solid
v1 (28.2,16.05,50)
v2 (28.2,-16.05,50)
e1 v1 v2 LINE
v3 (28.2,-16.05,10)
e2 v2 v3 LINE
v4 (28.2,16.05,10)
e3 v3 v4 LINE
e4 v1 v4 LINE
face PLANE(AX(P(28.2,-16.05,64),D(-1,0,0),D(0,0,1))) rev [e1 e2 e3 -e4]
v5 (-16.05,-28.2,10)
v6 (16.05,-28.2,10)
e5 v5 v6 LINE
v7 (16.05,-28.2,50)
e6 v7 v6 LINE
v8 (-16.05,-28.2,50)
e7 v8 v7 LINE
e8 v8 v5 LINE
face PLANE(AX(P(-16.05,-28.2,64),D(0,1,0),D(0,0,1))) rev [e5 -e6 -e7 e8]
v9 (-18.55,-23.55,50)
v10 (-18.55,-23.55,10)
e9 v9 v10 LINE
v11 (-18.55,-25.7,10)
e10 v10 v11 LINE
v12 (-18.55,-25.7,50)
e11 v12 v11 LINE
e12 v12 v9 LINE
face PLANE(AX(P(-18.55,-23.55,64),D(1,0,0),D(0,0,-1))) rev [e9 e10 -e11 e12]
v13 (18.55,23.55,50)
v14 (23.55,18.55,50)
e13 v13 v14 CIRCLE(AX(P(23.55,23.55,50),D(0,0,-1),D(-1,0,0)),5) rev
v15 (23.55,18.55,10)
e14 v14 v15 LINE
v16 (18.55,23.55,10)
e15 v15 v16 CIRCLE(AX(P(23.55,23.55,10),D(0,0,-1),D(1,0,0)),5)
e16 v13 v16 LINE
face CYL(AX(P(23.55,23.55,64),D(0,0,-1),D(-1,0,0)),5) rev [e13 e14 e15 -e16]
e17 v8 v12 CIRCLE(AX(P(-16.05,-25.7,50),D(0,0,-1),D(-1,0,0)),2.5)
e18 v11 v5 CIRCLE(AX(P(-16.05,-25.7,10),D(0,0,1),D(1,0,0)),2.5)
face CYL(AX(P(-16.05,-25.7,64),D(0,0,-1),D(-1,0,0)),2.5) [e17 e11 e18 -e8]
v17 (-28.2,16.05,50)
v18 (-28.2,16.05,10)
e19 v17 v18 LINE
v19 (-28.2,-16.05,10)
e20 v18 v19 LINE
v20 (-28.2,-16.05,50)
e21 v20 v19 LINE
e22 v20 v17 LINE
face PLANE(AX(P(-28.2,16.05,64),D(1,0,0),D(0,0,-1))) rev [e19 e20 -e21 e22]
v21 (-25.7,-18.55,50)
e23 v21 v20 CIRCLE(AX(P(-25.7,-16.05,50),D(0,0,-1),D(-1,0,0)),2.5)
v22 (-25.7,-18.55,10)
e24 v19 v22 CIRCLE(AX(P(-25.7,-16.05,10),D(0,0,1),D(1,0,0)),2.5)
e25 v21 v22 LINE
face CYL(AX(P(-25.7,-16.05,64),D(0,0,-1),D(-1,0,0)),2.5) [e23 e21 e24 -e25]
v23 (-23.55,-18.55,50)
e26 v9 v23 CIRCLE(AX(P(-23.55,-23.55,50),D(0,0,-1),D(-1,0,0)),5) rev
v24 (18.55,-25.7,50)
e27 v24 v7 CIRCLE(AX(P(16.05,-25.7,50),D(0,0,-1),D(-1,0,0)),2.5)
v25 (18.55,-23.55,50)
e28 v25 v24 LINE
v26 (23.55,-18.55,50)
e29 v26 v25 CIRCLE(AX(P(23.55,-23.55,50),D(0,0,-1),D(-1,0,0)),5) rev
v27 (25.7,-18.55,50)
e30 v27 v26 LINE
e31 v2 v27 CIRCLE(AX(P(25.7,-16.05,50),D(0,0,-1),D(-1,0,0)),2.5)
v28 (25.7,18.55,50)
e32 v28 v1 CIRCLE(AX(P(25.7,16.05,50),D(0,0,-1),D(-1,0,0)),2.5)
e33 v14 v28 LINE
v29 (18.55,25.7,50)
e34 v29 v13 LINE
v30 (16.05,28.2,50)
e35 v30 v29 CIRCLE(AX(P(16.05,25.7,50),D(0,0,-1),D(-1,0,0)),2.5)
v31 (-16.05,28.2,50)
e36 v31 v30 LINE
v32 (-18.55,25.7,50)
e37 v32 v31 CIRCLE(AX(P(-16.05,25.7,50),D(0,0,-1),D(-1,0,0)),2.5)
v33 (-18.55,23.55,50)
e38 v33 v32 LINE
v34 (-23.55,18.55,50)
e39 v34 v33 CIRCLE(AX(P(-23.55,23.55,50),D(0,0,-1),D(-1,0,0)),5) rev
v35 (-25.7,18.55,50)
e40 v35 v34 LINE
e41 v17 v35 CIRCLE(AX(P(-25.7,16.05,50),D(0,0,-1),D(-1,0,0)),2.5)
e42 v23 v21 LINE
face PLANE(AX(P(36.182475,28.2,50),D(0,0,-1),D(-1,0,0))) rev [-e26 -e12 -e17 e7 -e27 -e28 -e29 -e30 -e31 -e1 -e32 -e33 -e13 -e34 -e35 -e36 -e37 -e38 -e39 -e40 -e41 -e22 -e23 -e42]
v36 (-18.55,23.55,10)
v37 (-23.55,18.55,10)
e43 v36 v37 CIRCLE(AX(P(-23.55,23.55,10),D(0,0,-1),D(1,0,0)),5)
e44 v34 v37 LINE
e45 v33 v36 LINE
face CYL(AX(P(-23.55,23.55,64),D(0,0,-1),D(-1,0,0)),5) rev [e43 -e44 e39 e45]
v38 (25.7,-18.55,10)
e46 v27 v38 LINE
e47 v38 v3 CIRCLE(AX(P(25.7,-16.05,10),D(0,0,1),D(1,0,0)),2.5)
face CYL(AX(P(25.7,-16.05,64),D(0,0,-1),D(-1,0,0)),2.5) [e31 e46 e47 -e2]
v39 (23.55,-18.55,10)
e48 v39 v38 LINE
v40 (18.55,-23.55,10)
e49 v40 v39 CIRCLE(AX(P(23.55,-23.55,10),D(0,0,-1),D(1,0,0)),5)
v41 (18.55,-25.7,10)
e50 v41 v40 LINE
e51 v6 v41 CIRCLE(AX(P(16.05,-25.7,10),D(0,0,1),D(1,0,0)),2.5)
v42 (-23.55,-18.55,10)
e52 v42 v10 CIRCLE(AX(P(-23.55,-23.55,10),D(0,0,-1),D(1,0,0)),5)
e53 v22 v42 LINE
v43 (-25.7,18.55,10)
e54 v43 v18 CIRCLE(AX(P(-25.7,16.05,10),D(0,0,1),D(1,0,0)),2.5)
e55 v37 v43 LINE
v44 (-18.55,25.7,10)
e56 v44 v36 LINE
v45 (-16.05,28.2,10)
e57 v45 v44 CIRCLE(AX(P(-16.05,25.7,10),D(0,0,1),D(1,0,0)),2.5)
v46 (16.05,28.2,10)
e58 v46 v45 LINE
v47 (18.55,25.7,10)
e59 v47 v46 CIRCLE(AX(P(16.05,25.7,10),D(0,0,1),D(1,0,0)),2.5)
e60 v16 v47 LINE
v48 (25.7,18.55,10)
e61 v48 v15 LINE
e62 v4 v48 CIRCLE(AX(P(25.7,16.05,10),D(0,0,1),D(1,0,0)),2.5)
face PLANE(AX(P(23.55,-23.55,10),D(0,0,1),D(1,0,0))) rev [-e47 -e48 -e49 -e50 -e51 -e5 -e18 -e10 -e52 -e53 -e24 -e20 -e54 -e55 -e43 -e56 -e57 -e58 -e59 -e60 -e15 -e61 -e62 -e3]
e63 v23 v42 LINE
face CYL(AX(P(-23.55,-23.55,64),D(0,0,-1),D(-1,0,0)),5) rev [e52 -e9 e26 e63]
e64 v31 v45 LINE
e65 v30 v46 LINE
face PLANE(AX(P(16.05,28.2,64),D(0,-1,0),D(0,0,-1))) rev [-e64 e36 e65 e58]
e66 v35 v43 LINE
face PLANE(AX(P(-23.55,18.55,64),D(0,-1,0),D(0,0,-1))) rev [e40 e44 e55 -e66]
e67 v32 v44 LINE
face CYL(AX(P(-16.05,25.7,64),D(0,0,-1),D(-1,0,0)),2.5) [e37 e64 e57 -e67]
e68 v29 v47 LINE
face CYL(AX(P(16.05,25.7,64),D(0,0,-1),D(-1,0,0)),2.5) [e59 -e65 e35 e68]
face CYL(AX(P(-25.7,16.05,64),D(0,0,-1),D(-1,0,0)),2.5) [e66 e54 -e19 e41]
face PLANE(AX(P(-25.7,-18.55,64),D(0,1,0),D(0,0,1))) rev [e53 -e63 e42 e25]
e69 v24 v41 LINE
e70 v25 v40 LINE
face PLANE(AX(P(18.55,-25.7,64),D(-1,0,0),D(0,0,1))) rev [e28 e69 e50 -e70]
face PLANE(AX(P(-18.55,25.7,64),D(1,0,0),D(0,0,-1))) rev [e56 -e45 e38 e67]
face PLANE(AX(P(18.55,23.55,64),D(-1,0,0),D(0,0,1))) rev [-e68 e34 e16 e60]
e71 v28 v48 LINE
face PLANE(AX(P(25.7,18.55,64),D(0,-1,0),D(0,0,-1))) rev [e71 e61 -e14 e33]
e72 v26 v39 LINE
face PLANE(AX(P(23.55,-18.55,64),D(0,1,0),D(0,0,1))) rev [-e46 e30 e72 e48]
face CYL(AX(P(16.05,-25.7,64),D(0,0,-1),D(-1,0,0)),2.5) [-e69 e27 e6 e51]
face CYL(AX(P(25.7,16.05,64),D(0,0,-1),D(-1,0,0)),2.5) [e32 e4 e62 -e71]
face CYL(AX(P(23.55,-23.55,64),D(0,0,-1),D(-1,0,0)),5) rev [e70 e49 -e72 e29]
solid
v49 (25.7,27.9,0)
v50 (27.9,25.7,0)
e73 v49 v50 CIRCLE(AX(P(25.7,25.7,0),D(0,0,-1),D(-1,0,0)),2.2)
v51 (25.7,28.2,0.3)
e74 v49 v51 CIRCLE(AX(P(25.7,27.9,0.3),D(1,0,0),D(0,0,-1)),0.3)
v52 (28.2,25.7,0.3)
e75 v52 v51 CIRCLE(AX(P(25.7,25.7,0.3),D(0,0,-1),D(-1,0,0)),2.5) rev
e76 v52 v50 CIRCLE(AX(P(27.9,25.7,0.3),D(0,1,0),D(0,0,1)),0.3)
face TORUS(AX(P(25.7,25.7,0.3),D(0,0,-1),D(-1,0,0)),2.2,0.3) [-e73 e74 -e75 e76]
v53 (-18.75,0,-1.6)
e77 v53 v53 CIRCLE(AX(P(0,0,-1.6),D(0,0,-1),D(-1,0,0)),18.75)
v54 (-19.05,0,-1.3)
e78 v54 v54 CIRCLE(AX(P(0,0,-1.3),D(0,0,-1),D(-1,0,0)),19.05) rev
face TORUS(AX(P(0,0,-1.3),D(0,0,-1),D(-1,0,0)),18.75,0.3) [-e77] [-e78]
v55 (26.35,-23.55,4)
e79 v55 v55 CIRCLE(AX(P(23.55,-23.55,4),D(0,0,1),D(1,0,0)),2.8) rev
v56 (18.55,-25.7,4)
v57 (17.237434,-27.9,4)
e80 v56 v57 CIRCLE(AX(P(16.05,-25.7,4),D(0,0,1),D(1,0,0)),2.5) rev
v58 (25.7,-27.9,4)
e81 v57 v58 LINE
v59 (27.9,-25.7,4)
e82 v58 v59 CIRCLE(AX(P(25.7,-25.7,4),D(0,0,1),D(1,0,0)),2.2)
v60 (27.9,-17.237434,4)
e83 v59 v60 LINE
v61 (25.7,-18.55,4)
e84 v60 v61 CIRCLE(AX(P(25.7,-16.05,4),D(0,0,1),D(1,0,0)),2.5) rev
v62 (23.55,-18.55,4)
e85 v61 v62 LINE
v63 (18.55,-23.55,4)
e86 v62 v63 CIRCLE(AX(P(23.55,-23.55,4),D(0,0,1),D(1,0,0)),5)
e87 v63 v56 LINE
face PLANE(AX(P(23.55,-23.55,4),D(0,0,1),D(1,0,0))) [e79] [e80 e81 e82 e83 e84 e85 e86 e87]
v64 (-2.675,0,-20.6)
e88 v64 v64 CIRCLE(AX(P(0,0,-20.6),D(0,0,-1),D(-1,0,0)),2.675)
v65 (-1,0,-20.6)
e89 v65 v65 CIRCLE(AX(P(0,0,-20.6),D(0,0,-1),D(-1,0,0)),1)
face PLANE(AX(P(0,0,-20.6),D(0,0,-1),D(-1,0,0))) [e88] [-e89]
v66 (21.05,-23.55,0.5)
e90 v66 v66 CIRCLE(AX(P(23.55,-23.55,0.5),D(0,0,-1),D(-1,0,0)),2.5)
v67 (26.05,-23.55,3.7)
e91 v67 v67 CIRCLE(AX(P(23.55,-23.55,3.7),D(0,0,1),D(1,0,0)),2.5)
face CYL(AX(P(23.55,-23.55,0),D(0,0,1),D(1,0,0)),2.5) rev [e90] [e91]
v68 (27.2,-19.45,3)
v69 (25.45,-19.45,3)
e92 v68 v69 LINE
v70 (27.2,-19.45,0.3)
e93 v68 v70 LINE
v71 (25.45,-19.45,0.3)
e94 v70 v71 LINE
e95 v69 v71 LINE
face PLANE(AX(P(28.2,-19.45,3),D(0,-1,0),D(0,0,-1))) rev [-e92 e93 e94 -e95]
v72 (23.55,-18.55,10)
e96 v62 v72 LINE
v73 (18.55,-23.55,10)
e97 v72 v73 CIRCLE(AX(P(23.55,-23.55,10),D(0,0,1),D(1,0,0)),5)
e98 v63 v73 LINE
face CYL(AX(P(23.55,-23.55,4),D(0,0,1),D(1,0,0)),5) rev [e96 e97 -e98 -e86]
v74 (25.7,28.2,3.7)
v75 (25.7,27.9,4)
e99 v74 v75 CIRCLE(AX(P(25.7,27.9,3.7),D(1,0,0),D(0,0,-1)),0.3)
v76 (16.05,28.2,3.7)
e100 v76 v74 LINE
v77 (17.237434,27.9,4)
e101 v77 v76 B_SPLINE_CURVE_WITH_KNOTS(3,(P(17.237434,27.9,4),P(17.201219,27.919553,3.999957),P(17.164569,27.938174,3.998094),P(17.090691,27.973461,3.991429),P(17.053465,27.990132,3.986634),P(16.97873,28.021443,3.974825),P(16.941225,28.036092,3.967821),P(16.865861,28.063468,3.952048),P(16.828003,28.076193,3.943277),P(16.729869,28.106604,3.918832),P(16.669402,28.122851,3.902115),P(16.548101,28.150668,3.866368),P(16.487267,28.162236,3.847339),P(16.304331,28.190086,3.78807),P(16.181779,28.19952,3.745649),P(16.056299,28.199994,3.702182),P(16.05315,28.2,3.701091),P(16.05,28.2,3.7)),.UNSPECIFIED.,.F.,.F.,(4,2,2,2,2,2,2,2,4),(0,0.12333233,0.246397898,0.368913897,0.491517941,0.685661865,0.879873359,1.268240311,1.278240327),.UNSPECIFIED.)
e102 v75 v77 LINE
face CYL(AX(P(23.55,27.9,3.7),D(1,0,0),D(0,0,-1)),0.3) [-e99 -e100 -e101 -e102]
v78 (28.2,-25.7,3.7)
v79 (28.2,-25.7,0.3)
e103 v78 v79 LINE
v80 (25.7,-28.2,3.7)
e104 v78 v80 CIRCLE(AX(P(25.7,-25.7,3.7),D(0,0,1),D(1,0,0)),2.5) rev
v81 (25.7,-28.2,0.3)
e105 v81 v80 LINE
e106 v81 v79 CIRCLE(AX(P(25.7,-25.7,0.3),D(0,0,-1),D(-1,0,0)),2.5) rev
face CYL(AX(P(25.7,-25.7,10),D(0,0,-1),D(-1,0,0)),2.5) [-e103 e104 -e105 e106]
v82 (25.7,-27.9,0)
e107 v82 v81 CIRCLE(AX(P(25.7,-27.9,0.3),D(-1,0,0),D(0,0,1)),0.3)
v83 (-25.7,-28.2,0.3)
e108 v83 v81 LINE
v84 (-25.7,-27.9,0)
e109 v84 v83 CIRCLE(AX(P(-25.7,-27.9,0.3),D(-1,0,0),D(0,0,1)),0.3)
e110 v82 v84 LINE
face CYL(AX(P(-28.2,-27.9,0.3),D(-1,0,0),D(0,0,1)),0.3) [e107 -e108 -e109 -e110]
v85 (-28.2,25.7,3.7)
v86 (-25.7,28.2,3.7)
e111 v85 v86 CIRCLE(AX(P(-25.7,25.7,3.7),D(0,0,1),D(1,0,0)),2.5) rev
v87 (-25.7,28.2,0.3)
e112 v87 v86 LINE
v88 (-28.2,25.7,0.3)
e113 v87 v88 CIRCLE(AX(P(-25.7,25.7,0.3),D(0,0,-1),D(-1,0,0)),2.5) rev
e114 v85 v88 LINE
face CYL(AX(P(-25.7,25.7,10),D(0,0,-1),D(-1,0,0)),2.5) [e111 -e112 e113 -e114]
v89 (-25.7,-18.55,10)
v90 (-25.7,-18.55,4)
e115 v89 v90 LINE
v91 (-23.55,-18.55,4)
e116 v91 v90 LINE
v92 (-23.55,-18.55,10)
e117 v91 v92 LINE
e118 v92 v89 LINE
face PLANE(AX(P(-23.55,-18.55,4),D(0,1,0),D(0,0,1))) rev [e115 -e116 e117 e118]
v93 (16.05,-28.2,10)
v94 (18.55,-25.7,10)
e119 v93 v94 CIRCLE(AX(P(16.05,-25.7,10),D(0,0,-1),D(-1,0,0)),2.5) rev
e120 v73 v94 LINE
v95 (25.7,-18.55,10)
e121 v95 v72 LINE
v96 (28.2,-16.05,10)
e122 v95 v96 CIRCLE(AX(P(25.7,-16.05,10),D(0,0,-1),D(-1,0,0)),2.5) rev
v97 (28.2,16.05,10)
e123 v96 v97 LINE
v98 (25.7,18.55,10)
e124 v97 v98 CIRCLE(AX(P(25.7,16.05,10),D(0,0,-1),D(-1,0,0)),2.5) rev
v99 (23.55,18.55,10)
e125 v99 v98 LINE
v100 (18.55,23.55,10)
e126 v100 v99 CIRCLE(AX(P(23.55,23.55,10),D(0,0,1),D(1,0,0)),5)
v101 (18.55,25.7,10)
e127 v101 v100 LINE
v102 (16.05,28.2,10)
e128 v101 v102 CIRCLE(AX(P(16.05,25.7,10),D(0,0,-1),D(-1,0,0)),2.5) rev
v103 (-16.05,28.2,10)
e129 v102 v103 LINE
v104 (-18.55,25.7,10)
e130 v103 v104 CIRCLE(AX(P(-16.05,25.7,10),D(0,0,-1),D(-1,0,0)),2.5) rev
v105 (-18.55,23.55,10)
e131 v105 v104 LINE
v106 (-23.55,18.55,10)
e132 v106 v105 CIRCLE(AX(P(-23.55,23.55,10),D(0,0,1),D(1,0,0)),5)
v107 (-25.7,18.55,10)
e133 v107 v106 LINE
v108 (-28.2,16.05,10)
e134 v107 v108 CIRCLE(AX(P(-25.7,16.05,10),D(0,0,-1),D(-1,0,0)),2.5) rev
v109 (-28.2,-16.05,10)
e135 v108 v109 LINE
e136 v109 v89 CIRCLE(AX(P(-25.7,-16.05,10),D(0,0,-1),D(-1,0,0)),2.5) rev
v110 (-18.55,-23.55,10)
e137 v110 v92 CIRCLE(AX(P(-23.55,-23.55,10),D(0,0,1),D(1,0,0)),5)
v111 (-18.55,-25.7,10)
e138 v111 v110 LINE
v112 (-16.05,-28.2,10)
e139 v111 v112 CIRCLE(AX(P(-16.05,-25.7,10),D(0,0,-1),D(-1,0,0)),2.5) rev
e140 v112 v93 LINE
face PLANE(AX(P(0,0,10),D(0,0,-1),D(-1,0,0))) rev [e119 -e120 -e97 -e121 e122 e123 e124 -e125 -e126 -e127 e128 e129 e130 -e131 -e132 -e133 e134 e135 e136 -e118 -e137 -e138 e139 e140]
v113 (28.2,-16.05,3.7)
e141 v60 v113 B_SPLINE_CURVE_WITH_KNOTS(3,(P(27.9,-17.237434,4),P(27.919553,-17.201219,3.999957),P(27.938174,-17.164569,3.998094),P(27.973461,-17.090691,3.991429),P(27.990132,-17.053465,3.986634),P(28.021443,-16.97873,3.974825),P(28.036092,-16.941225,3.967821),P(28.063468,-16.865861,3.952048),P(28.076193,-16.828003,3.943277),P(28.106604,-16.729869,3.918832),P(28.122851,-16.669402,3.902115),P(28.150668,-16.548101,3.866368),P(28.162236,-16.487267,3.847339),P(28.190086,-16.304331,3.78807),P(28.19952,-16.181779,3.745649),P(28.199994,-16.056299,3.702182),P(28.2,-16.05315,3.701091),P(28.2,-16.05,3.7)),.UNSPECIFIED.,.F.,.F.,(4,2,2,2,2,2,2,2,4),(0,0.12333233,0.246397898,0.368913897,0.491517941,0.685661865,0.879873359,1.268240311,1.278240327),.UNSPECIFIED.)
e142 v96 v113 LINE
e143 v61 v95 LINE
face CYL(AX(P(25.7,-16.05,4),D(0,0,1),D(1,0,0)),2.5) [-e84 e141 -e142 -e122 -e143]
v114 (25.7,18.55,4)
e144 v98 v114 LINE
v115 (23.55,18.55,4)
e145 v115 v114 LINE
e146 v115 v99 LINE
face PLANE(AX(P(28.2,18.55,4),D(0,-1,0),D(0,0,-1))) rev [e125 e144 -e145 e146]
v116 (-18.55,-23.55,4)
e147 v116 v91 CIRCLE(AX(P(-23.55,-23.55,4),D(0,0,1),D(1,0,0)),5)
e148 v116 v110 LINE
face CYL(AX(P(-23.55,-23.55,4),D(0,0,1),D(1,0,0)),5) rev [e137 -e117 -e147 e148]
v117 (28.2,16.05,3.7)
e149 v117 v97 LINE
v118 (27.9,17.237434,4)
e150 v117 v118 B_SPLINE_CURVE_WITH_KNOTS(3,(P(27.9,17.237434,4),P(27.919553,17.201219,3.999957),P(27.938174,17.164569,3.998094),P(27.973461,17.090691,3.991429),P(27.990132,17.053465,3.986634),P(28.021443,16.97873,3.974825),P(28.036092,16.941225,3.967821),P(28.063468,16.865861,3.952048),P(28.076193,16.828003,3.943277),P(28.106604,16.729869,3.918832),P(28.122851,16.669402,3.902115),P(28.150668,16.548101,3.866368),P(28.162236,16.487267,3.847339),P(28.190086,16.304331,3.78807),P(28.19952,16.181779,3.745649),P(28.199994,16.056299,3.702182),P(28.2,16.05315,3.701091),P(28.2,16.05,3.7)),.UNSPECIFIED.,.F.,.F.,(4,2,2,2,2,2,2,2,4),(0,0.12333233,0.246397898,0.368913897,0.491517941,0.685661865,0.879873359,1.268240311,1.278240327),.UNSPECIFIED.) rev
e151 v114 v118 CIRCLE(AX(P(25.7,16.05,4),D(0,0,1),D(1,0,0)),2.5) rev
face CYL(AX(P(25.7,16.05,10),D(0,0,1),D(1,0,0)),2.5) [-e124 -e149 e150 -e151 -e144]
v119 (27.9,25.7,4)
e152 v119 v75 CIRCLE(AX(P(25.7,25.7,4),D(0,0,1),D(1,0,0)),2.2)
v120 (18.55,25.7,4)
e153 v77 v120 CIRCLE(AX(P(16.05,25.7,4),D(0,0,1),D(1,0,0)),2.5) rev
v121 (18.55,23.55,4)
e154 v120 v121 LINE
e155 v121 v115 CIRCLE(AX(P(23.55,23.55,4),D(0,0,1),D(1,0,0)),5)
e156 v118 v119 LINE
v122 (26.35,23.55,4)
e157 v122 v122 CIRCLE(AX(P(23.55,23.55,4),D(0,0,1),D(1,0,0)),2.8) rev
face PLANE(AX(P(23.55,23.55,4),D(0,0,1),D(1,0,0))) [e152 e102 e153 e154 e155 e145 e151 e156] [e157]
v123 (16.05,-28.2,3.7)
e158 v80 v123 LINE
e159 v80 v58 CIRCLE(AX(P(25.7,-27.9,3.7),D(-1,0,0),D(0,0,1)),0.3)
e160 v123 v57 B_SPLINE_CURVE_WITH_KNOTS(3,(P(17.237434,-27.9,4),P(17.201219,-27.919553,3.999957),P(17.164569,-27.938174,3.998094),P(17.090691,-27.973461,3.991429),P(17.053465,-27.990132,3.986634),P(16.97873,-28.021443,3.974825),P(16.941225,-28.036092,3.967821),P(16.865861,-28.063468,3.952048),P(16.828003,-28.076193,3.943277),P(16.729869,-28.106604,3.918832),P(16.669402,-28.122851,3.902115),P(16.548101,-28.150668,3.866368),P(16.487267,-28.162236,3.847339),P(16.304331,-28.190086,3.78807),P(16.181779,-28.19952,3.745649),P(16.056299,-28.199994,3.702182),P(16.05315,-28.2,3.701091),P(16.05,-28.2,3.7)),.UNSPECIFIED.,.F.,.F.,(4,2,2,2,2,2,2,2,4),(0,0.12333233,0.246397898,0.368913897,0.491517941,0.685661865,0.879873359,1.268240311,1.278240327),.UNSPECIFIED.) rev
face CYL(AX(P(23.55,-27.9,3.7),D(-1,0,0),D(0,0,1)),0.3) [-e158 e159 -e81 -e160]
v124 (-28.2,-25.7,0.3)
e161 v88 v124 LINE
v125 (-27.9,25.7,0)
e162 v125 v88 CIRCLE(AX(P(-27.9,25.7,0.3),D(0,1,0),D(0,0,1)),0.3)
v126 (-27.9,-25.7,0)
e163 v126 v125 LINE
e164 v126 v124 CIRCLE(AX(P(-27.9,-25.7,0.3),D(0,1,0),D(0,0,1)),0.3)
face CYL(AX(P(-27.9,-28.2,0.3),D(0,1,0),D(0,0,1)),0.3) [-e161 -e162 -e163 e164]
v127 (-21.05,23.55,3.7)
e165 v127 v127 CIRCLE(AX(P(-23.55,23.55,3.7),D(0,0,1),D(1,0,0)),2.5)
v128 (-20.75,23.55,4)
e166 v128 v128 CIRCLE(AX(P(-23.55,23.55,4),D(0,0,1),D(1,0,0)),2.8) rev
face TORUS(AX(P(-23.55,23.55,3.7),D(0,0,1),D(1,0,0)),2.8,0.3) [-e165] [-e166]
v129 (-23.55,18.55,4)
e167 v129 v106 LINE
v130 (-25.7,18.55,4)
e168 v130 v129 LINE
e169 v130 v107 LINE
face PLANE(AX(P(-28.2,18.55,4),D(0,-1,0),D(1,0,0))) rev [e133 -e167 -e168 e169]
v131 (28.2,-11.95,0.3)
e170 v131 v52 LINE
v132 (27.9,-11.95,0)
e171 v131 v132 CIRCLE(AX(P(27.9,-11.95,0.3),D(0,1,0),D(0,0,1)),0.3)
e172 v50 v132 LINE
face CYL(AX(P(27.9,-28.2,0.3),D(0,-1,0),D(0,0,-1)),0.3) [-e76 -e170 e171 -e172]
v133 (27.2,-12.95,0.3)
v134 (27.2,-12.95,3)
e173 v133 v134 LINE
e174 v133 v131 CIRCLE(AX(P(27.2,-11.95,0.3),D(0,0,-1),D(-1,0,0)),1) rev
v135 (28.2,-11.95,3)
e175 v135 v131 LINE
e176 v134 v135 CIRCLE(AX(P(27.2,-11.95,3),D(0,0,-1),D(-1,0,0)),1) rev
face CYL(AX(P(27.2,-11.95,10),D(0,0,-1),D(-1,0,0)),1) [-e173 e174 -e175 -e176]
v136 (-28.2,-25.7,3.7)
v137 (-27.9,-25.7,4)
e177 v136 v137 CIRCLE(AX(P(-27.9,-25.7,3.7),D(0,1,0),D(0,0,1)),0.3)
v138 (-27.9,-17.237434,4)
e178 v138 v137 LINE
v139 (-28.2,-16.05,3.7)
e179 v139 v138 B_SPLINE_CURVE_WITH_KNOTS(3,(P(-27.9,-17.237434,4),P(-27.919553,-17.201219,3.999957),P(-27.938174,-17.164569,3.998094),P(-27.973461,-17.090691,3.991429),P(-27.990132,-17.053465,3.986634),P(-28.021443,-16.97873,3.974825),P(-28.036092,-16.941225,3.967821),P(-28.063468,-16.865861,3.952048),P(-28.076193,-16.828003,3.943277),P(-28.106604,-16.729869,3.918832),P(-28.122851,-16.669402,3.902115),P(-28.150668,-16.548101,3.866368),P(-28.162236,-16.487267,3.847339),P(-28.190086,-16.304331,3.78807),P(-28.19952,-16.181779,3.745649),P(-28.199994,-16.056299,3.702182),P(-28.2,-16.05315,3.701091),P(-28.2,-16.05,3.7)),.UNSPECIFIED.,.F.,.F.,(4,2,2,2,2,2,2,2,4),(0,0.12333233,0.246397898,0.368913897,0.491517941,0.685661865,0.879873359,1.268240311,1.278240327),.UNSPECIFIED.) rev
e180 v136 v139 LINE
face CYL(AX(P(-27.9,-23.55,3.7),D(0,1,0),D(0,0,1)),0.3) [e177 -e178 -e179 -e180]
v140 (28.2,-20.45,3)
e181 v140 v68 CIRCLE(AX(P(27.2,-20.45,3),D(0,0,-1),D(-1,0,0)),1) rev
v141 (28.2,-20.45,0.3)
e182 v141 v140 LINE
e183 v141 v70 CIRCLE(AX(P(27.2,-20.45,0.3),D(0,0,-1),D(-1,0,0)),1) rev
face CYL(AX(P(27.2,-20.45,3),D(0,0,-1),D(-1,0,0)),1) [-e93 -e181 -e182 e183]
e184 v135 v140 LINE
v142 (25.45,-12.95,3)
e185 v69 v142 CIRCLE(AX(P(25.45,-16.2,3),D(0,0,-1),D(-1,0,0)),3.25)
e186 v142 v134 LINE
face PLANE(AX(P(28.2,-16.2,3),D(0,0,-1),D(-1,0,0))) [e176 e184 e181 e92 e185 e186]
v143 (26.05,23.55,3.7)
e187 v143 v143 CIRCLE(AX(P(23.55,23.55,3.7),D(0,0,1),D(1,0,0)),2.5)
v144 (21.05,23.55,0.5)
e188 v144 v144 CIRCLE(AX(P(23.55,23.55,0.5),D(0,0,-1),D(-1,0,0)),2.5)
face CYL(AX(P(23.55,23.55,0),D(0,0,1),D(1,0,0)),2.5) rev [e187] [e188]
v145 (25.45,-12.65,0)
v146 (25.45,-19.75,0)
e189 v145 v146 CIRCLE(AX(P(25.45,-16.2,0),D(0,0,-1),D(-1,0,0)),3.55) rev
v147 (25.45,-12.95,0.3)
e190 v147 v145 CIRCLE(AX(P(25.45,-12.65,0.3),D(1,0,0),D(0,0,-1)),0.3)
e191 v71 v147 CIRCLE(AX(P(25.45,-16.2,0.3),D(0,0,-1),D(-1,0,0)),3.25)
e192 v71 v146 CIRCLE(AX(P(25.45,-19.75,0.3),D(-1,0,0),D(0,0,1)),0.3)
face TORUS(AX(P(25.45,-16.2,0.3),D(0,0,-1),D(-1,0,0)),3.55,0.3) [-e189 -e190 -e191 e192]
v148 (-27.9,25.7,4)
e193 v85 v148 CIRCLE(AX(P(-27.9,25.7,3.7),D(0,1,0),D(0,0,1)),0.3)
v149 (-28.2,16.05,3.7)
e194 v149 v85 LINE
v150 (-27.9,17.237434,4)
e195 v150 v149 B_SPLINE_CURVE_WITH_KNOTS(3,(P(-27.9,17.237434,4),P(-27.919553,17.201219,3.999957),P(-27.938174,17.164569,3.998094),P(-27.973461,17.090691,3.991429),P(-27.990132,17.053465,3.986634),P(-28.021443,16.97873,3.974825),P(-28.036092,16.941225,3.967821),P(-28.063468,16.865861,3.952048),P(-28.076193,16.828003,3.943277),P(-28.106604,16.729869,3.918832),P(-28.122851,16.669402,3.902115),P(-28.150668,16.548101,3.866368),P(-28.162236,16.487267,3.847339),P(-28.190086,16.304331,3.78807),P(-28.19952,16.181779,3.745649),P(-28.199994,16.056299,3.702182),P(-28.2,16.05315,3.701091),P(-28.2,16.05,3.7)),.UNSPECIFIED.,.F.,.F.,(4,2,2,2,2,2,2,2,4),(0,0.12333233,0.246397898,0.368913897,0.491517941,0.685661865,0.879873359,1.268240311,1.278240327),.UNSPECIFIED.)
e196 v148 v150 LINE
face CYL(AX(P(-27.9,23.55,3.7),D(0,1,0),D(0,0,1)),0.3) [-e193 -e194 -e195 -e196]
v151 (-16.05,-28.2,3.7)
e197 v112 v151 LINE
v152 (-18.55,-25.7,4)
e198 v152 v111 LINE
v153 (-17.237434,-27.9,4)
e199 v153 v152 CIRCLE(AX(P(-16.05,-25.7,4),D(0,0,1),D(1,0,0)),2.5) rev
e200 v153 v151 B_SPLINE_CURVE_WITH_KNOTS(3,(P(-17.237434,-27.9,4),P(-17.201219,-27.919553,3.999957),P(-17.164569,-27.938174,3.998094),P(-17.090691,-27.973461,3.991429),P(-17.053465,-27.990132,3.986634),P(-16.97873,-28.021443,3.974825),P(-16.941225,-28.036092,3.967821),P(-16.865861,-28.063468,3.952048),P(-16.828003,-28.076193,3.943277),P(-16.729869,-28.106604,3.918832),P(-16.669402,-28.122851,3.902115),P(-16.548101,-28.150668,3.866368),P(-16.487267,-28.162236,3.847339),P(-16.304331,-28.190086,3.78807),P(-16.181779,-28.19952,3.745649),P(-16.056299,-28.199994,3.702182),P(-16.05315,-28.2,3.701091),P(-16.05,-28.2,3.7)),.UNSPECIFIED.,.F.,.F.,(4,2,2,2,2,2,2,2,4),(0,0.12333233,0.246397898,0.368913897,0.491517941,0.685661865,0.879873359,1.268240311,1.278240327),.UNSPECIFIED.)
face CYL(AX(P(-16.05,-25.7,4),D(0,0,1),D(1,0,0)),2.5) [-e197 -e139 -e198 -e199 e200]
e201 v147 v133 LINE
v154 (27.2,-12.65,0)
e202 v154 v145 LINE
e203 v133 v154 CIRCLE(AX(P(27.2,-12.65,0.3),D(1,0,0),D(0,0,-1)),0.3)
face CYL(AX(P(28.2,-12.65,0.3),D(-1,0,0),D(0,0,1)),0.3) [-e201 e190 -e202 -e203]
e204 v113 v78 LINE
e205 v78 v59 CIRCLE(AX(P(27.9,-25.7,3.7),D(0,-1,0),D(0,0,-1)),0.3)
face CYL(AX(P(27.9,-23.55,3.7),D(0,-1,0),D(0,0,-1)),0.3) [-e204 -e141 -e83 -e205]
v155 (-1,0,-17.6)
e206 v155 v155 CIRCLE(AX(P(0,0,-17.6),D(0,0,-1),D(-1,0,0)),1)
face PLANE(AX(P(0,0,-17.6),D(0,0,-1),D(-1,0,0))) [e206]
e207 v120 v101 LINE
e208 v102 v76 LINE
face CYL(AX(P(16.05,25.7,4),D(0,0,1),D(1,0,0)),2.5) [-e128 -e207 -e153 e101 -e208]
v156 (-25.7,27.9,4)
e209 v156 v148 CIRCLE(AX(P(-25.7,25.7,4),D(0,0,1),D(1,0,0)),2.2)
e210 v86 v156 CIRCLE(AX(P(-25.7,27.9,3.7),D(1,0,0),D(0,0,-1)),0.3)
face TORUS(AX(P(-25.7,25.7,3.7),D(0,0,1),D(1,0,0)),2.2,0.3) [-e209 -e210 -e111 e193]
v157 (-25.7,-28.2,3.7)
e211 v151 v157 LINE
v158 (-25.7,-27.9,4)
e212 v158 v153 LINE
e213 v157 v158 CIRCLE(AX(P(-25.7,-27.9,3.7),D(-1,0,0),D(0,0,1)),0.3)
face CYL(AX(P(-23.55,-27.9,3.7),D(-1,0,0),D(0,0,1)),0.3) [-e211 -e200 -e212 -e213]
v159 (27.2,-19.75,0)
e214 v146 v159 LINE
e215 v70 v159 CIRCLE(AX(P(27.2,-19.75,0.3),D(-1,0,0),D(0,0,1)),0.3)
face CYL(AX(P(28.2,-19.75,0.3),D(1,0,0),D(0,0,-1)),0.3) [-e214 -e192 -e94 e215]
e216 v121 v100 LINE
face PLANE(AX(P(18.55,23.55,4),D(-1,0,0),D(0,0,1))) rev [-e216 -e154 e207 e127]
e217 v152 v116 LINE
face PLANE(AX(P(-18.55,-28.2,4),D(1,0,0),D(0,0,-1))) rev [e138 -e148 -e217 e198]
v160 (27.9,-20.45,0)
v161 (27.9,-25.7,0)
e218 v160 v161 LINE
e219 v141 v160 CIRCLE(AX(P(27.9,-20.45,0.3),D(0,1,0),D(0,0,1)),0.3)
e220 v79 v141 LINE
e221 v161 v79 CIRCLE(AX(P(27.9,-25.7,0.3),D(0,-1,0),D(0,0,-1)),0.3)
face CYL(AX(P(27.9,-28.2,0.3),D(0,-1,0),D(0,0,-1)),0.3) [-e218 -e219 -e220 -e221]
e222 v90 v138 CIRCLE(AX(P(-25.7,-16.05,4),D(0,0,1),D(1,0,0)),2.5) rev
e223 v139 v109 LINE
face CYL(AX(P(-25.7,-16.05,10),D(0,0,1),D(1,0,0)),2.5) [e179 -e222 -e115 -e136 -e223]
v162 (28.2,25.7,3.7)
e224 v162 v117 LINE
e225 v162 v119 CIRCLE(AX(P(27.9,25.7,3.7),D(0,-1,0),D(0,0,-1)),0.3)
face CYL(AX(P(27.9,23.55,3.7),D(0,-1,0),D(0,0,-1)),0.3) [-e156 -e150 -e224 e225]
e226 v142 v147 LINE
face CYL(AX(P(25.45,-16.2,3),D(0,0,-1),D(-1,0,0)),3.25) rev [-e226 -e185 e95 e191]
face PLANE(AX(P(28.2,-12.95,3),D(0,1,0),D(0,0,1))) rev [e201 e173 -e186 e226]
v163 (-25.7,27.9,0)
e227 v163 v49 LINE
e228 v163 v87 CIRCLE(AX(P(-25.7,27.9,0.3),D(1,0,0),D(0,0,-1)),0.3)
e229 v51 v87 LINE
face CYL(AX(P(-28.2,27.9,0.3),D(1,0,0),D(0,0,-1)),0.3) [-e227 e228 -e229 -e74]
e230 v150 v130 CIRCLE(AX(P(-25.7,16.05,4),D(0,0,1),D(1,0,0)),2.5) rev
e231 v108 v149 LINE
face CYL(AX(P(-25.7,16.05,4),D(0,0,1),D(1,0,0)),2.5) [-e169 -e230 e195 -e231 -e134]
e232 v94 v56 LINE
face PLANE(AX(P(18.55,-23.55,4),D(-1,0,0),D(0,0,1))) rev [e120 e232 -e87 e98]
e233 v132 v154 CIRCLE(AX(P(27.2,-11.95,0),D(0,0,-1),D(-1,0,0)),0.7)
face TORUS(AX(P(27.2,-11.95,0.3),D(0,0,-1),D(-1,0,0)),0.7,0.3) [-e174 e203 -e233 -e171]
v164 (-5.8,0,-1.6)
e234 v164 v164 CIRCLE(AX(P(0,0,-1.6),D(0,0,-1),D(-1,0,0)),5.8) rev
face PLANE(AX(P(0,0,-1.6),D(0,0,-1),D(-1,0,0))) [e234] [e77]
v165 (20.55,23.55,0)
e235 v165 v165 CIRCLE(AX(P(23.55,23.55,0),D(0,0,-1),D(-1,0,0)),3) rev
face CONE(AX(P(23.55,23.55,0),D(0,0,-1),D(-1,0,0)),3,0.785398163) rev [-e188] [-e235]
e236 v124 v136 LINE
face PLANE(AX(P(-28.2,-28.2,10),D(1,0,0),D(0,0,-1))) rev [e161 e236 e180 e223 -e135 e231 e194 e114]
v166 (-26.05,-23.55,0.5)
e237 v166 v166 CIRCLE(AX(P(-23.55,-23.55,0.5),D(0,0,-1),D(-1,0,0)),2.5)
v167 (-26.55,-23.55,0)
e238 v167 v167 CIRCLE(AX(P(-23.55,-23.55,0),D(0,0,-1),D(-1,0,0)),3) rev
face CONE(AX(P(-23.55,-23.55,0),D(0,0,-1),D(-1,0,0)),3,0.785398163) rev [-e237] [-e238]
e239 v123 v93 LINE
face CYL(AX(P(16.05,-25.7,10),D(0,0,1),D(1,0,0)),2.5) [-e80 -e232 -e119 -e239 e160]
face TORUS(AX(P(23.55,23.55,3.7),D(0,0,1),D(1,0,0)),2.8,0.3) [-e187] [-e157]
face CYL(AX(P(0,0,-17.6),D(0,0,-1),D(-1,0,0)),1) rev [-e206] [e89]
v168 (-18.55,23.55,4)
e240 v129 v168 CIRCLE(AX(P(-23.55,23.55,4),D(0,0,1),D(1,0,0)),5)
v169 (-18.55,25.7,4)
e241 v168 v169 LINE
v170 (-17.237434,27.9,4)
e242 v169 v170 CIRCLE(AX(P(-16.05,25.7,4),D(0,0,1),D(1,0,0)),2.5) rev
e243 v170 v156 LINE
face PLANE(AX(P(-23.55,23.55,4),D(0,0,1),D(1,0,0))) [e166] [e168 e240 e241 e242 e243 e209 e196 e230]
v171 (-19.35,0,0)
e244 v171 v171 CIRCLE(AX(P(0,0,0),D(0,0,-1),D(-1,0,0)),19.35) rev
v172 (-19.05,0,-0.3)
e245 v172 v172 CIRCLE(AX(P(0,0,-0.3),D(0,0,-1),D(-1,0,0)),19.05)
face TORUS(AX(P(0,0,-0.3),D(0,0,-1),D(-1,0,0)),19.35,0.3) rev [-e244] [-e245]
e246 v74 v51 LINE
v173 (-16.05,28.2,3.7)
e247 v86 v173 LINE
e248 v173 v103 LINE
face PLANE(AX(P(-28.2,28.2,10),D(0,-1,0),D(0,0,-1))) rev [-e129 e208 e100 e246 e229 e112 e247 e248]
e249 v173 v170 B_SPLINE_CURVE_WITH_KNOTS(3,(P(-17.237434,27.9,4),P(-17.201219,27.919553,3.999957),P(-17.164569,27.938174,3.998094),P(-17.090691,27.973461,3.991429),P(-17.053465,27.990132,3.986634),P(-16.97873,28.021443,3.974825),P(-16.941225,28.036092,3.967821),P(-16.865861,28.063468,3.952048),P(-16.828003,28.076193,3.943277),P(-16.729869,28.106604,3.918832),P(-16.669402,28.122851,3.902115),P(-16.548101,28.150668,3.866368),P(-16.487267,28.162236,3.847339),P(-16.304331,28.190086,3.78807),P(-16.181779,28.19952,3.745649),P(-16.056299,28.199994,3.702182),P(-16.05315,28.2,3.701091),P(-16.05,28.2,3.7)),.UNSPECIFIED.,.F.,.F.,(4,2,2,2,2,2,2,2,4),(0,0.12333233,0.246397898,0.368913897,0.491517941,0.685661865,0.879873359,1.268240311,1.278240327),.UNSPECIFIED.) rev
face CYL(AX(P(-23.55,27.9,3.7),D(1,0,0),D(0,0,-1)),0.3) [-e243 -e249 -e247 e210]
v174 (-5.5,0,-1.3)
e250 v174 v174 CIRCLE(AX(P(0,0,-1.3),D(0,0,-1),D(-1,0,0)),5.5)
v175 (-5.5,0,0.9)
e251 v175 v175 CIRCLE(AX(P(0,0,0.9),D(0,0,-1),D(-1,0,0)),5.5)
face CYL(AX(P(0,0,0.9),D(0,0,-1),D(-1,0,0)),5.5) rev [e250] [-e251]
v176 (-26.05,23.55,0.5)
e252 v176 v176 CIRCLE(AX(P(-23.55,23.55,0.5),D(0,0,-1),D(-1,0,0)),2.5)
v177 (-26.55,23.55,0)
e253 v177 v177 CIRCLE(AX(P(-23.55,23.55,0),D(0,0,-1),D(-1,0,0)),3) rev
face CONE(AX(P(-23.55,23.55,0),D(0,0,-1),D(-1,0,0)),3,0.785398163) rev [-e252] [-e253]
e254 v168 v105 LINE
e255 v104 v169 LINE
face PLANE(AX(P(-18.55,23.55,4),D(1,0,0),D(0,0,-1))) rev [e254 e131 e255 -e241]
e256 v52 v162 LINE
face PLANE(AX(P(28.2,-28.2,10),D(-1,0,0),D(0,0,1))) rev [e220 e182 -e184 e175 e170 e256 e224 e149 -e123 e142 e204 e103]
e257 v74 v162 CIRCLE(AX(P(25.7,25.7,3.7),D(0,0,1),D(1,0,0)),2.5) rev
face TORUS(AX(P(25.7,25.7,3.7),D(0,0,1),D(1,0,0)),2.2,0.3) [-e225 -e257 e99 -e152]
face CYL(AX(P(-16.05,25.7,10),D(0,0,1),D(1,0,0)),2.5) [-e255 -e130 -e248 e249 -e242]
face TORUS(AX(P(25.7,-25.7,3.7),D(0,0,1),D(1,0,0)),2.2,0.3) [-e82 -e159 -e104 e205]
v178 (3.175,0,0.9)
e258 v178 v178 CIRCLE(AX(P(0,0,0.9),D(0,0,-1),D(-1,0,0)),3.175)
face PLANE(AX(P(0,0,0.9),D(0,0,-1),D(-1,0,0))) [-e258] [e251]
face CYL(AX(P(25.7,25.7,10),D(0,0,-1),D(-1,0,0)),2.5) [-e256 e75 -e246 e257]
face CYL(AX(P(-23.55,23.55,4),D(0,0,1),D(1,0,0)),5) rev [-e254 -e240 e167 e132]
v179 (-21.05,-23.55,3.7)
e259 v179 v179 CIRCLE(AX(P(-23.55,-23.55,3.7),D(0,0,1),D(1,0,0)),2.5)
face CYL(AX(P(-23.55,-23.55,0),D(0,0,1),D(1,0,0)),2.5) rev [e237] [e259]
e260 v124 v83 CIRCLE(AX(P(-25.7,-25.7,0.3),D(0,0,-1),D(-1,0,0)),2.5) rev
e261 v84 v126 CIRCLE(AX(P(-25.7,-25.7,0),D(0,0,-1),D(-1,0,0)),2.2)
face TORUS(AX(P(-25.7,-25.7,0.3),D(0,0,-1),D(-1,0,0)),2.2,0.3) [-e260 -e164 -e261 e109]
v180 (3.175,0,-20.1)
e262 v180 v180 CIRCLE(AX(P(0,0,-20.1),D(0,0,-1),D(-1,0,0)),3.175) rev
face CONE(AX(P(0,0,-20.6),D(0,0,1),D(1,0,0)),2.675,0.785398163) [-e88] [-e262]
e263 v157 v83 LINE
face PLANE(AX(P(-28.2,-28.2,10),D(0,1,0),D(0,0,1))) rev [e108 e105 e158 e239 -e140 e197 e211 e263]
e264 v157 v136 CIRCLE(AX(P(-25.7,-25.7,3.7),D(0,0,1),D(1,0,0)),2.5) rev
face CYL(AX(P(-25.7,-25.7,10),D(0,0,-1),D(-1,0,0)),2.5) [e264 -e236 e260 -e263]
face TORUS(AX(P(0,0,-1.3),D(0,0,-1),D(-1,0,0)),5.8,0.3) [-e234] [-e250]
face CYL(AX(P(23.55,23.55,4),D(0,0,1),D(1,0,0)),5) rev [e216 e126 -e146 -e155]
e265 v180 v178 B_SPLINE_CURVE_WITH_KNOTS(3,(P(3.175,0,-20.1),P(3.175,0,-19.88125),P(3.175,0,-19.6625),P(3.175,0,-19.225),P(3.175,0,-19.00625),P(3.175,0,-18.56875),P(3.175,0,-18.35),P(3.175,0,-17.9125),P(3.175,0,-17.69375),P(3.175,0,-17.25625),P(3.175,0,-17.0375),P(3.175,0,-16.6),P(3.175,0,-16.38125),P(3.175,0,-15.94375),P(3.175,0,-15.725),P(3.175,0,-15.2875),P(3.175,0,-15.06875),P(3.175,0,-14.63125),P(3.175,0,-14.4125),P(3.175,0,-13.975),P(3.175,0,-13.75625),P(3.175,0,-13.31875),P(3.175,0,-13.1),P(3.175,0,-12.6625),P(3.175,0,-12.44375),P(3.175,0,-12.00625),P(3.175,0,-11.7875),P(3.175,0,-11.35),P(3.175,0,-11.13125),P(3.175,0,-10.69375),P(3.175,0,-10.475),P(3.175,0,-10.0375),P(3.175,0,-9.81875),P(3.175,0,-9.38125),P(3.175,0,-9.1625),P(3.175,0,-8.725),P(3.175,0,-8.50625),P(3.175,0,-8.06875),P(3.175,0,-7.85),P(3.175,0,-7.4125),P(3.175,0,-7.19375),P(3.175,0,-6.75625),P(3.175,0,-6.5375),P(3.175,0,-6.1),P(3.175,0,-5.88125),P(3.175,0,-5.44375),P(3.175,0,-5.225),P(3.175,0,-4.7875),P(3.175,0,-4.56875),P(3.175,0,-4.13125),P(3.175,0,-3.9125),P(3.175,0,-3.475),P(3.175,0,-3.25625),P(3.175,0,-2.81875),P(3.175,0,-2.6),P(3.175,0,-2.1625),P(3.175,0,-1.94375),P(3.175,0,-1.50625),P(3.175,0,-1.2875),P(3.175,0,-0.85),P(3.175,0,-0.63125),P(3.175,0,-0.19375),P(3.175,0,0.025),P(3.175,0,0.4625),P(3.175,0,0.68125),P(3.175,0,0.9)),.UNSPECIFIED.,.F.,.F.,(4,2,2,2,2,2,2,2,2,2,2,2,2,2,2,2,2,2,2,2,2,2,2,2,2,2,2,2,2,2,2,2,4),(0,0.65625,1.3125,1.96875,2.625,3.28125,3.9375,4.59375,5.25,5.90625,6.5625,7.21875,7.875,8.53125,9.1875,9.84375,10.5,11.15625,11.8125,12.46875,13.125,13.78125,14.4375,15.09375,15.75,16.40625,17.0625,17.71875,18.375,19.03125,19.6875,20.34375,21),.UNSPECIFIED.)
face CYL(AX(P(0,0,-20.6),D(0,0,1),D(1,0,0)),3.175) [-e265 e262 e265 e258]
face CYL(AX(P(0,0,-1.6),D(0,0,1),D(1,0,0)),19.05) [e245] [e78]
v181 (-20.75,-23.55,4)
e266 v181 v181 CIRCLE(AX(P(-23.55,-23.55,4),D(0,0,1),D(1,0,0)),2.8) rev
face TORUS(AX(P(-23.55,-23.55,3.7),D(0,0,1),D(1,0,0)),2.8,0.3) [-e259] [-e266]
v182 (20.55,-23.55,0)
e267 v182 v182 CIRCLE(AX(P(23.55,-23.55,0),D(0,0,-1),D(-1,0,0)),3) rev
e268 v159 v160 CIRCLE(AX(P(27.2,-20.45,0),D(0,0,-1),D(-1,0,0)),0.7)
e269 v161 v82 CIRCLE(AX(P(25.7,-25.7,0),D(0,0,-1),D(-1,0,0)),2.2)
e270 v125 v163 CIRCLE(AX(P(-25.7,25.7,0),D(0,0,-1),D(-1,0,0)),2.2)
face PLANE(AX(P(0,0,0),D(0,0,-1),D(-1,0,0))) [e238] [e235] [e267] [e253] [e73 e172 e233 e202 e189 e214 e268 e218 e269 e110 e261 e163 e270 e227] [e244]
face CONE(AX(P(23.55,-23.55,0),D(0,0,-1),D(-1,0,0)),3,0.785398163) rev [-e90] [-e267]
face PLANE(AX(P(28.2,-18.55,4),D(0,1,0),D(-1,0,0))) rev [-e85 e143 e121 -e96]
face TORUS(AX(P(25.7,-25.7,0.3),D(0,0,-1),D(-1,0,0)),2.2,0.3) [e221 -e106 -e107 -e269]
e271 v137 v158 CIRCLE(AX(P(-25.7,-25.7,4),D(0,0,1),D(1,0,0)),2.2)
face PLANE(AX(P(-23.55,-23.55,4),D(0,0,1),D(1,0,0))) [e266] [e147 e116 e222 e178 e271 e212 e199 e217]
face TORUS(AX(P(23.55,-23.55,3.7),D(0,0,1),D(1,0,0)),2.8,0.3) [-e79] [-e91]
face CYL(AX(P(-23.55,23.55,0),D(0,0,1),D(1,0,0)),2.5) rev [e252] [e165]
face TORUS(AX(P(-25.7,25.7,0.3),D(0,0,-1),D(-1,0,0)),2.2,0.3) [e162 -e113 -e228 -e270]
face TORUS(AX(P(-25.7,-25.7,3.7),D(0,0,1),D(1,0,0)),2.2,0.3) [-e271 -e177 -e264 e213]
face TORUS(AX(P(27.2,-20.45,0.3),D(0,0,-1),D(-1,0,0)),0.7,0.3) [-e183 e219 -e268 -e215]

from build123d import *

# Parameters (mm, degrees)
SKETCH_1_W          = 56.4
SKETCH_1_H          = 56.4
EXTRUDE_1_DEPTH     = 10
SKETCH_2_R          = 2.5
CUT_EXTRUDE_1_DEPTH = 42.115447219
CUT_EXTRUDE_2_DEPTH = 6
FILLET_1_R          = 2.5
SKETCH_4_R          = 19.05
EXTRUDE_2_DEPTH     = 1.6
SKETCH_5_R          = 3.175
EXTRUDE_3_DEPTH     = 20.6
CUT_EXTRUDE_START   = -2.5
SKETCH_6_R          = 5.5
SKETCH_6_R_2        = 3.175
CUT_EXTRUDE_3_DEPTH = 2.5
CHAMFER_1_SIZE      = 0.5
SKETCH_7_R          = 1
CUT_EXTRUDE_4_DEPTH = 3
CUT_EXTRUDE_5_DEPTH = 3
FILLET_2_R          = 1
EXTRUDE_5_DEPTH     = 54
EXTRUDE_6_DEPTH     = 11
FILLET_7_R          = 0.5
SKETCH_14_R         = 5.5
CUT_EXTRUDE_8_DEPTH = 4
SKETCH_15_R         = 3.25
EXTRUDE_7_DEPTH     = 1
CUT_EXTRUDE_START_2 = -3
SKETCH_16_R         = 1
CUT_EXTRUDE_9_DEPTH = 3
CHAMFER_3_SIZE      = 1
FILLET_8_R          = 0.5
FILLET_9_R          = 0.3
SKETCH2_W           = 73.4450425
SKETCH2_H           = 31.151425638
CUT_EXTRUDE1_DEPTH  = 98.985713331


with BuildPart() as part:
    # Эскиз1 → Бобышка-Вытянуть1 (new body)
    with BuildSketch(Plane.XY):
        Rectangle(SKETCH_1_W, SKETCH_1_H)
    extrude(amount=EXTRUDE_1_DEPTH)

    # Эскиз2 → Вырез-Вытянуть1 (cut, through all)
    with BuildSketch(Plane.XY.offset(10)):
        with Locations((-23.55, 23.55)):
            Circle(SKETCH_2_R)
        with Locations((23.55, 23.55)):
            Circle(SKETCH_2_R)
        with Locations((23.55, -23.55)):
            Circle(SKETCH_2_R)
        with Locations((-23.55, -23.55)):
            Circle(SKETCH_2_R)
    extrude(amount=-CUT_EXTRUDE_1_DEPTH, mode=Mode.SUBTRACT)

    # Эскиз3 → Вырез-Вытянуть2 (cut)
    with BuildSketch(Plane.XY.offset(10)):
        with BuildLine():
            Line((-18.55, 23.55), (-18.55, 28.2))
            Line((-18.55, 28.2), (-28.2, 28.2))
            Line((-28.2, 28.2), (-28.2, 18.55))
            Line((-28.2, 18.55), (-23.55, 18.55))
            ThreePointArc((-23.55, 18.55), (-20.014466094, 20.014466094), (-18.55, 23.55))
        make_face()
        with BuildLine():
            Line((18.55, 23.55), (18.55, 28.2))
            Line((18.55, 28.2), (28.2, 28.2))
            Line((28.2, 28.2), (28.2, 18.55))
            Line((28.2, 18.55), (23.55, 18.55))
            ThreePointArc((23.55, 18.55), (20.014466094, 20.014466094), (18.55, 23.55))
        make_face()
        with BuildLine():
            Line((18.55, -23.55), (18.55, -28.2))
            Line((18.55, -28.2), (28.2, -28.2))
            Line((28.2, -28.2), (28.2, -18.55))
            Line((28.2, -18.55), (23.55, -18.55))
            ThreePointArc((23.55, -18.55), (20.014466094, -20.014466094), (18.55, -23.55))
        make_face()
        with BuildLine():
            Line((-23.55, -18.55), (-28.2, -18.55))
            Line((-28.2, -18.55), (-28.2, -28.2))
            Line((-28.2, -28.2), (-18.55, -28.2))
            Line((-18.55, -28.2), (-18.55, -23.55))
            ThreePointArc((-18.55, -23.55), (-20.014466094, -20.014466094), (-23.55, -18.55))
        make_face()
    extrude(amount=-CUT_EXTRUDE_2_DEPTH, mode=Mode.SUBTRACT)

    # Скругление1
    fillet_1_edges = [part.edges().sort_by_distance(p)[0] for p in [
        (-28.2, 28.2, 2),
        (-28.2, 18.55, 7),
        (-18.55, 28.2, 7),
        (28.2, 28.2, 2),
        (18.55, 28.2, 7),
        (28.2, 18.55, 7),
        (28.2, -28.2, 2),
        (28.2, -18.55, 7),
        (18.55, -28.2, 7),
        (-28.2, -28.2, 2),
        (-18.55, -28.2, 7),
        (-28.2, -18.55, 7),
    ]]
    fillet(fillet_1_edges, radius=FILLET_1_R)

    # Эскиз4 → Бобышка-Вытянуть2 (add)
    with BuildSketch(Plane(origin=(0, 0, 0), x_dir=(-1, 0, 0), z_dir=(0, 0, -1))):
        Circle(SKETCH_4_R)
    extrude(amount=EXTRUDE_2_DEPTH)

    # Эскиз5 → Бобышка-Вытянуть3 (add)
    with BuildSketch(Plane(origin=(0, 0, 0), x_dir=(-1, 0, 0), z_dir=(0, 0, -1))):
        with Locations(Location((0, 0, 0), (0, 0, 180))):
            Circle(SKETCH_5_R)
    extrude(amount=EXTRUDE_3_DEPTH)

    # Эскиз6 → Вырез-Вытянуть3 (cut)
    with BuildSketch(Plane(origin=(0, 0, -1.6), x_dir=(-1, 0, 0), z_dir=(0, 0, -1)).offset(CUT_EXTRUDE_START)):
        Circle(SKETCH_6_R)
        with Locations(Location((0, 0, 0), (0, 0, 180))):
            Circle(SKETCH_6_R_2, mode=Mode.SUBTRACT)
    extrude(amount=CUT_EXTRUDE_3_DEPTH, mode=Mode.SUBTRACT)

    # Фаска1
    chamfer_1_edges = [part.edges().sort_by_distance(p)[0] for p in [
        (-26.05, 23.55, 0),
        (21.05, 23.55, 0),
        (-3.175, 0, -20.6),
        (21.05, -23.55, 0),
        (-26.05, -23.55, 0),
    ]]
    chamfer(chamfer_1_edges, length=CHAMFER_1_SIZE)

    # Эскиз7 → Вырез-Вытянуть4 (cut)
    with BuildSketch(Plane(origin=(0, 0, -20.6), x_dir=(-1, 0, 0), z_dir=(0, 0, -1))):
        Circle(SKETCH_7_R)
    extrude(amount=-CUT_EXTRUDE_4_DEPTH, mode=Mode.SUBTRACT)

    # Эскиз8 → Вырез-Вытянуть5 (cut)
    with BuildSketch(Plane(origin=(0, 0, 0), x_dir=(-1, 0, 0), z_dir=(0, 0, -1))):
        with BuildLine():
            Line((-28.2, -12.95), (-25.45, -12.95))
            ThreePointArc((-25.45, -12.95), (-22.2, -16.2), (-25.45, -19.45))
            Line((-25.45, -19.45), (-28.2, -19.45))
            ThreePointArc((-28.2, -19.45), (-31.45, -16.2), (-28.2, -12.95))
        make_face()
    extrude(amount=-CUT_EXTRUDE_5_DEPTH, mode=Mode.SUBTRACT)

    # Скругление2
    fillet_2_edges = [part.edges().sort_by_distance(p)[0] for p in [
        (28.2, -19.45, 1.5),
        (28.2, -12.95, 1.5),
    ]]
    fillet(fillet_2_edges, radius=FILLET_2_R)

    # Скругление9
    fillet_9_edges = [part.edges().sort_by_distance(p)[0] for p in [
        (28.2, -20.875, 4),
        (28.2, -23.075, 0),
        (0, -28.2, 0),
        (-28.2, 0, 0),
        (0, 28.2, 0),
        (27.467766953, 27.467766953, 0),
        (-27.467766953, 27.467766953, 0),
        (-27.467766953, -27.467766953, 0),
        (27.467766953, -27.467766953, 0),
        (-20.875, -28.2, 4),
        (27.467766953, -27.467766953, 4),
        (-28.2, 20.875, 4),
        (-27.467766953, -27.467766953, 4),
        (20.875, 28.2, 4),
        (-27.467766953, 27.467766953, 4),
        (27.467766953, 27.467766953, 4),
        (19.05, 0, 0),
        (19.05, 0, -1.6),
        (5.5, 0, -1.6),
        (26.325, -12.95, 0),
        (22.2, -16.2, 0),
        (26.325, -19.45, 0),
        (28.2, 6.875, 0),
        (27.907106781, -12.657106781, 0),
        (27.907106781, -19.742893219, 0),
        (-20.875, 28.2, 4),
        (-26.05, 23.55, 4),
        (28.2, 20.875, 4),
        (21.05, 23.55, 4),
        (20.875, -28.2, 4),
        (21.05, -23.55, 4),
        (-28.2, -20.875, 4),
        (-26.05, -23.55, 4),
    ]]
    fillet(fillet_9_edges, radius=FILLET_9_R)


with BuildPart() as body_2:
    # Эскиз11 → Бобышка-Вытянуть5 (new body)
    with BuildSketch(Plane.XY.offset(10)):
        with BuildLine():
            Line((23.55, -18.55), (25.7, -18.55))
            ThreePointArc((25.7, -18.55), (27.467766953, -17.817766953), (28.2, -16.05))
            Line((28.2, -16.05), (28.2, 16.05))
            ThreePointArc((28.2, 16.05), (27.467766953, 17.817766953), (25.7, 18.55))
            Line((25.7, 18.55), (23.55, 18.55))
            ThreePointArc((23.55, 18.55), (20.014466094, 20.014466094), (18.55, 23.55))
            Line((18.55, 23.55), (18.55, 25.7))
            ThreePointArc((18.55, 25.7), (17.817766953, 27.467766953), (16.05, 28.2))
            Line((16.05, 28.2), (-16.05, 28.2))
            ThreePointArc((-16.05, 28.2), (-17.817766953, 27.467766953), (-18.55, 25.7))
            Line((-18.55, 25.7), (-18.55, 23.55))
            ThreePointArc((-18.55, 23.55), (-20.014466094, 20.014466094), (-23.55, 18.55))
            Line((-23.55, 18.55), (-25.7, 18.55))
            ThreePointArc((-25.7, 18.55), (-27.467766953, 17.817766953), (-28.2, 16.05))
            Line((-28.2, 16.05), (-28.2, -16.05))
            ThreePointArc((-28.2, -16.05), (-27.467766953, -17.817766953), (-25.7, -18.55))
            Line((-25.7, -18.55), (-23.55, -18.55))
            ThreePointArc((-23.55, -18.55), (-20.014466094, -20.014466094), (-18.55, -23.55))
            Line((-18.55, -23.55), (-18.55, -25.7))
            ThreePointArc((-18.55, -25.7), (-17.817766953, -27.467766953), (-16.05, -28.2))
            Line((-16.05, -28.2), (16.05, -28.2))
            ThreePointArc((16.05, -28.2), (17.817766953, -27.467766953), (18.55, -25.7))
            Line((18.55, -25.7), (18.55, -23.55))
            ThreePointArc((18.55, -23.55), (20.014466094, -20.014466094), (23.55, -18.55))
        make_face()
    extrude(amount=EXTRUDE_5_DEPTH)


with BuildPart() as body_3:
    # Эскиз12 → Бобышка-Вытянуть6 (new body)
    with BuildSketch(Plane.XY.offset(64)):
        with BuildLine():
            Line((23.55, -18.55), (25.7, -18.55))
            ThreePointArc((25.7, -18.55), (27.467766953, -17.817766953), (28.2, -16.05))
            Line((28.2, -16.05), (28.2, 16.05))
            ThreePointArc((28.2, 16.05), (27.467766953, 17.817766953), (25.7, 18.55))
            Line((25.7, 18.55), (23.55, 18.55))
            ThreePointArc((23.55, 18.55), (20.014466094, 20.014466094), (18.55, 23.55))
            Line((18.55, 23.55), (18.55, 25.7))
            ThreePointArc((18.55, 25.7), (17.817766953, 27.467766953), (16.05, 28.2))
            Line((16.05, 28.2), (-16.05, 28.2))
            ThreePointArc((-16.05, 28.2), (-17.817766953, 27.467766953), (-18.55, 25.7))
            Line((-18.55, 25.7), (-18.55, 23.55))
            ThreePointArc((-18.55, 23.55), (-20.014466094, 20.014466094), (-23.55, 18.55))
            Line((-23.55, 18.55), (-25.7, 18.55))
            ThreePointArc((-25.7, 18.55), (-27.467766953, 17.817766953), (-28.2, 16.05))
            Line((-28.2, 16.05), (-28.2, -16.05))
            ThreePointArc((-28.2, -16.05), (-27.467766953, -17.817766953), (-25.7, -18.55))
            Line((-25.7, -18.55), (-23.55, -18.55))
            ThreePointArc((-23.55, -18.55), (-20.014466094, -20.014466094), (-18.55, -23.55))
            Line((-18.55, -23.55), (-18.55, -25.7))
            ThreePointArc((-18.55, -25.7), (-17.817766953, -27.467766953), (-16.05, -28.2))
            Line((-16.05, -28.2), (16.05, -28.2))
            ThreePointArc((16.05, -28.2), (17.817766953, -27.467766953), (18.55, -25.7))
            Line((18.55, -25.7), (18.55, -23.55))
            ThreePointArc((18.55, -23.55), (20.014466094, -20.014466094), (23.55, -18.55))
        make_face()
    extrude(amount=EXTRUDE_6_DEPTH)

    # Скругление7
    fillet_7_edges = [body_3.edges().sort_by_distance(p)[0] for p in [
        (27.467766953, -17.817766953, 75),
        (28.2, 0, 75),
        (27.467766953, 17.817766953, 75),
        (24.625, 18.55, 75),
        (20.014466094, 20.014466094, 75),
        (18.55, 24.625, 75),
        (17.817766953, 27.467766953, 75),
        (0, 28.2, 75),
        (-17.817766953, 27.467766953, 75),
        (-18.55, 24.625, 75),
        (20.014466094, -20.014466094, 75),
        (-20.014466094, 20.014466094, 75),
        (-24.625, 18.55, 75),
        (-27.467766953, 17.817766953, 75),
        (-28.2, 0, 75),
        (-27.467766953, -17.817766953, 75),
        (-24.625, -18.55, 75),
        (-20.014466094, -20.014466094, 75),
        (-18.55, -24.625, 75),
        (-17.817766953, -27.467766953, 75),
        (0, -28.2, 75),
        (24.625, -18.55, 75),
        (17.817766953, -27.467766953, 75),
        (18.55, -24.625, 75),
    ]]
    fillet(fillet_7_edges, radius=FILLET_7_R)

    # Эскиз14 → Вырез-Вытянуть8 (cut)
    with BuildSketch(Plane.XY.offset(75)):
        with Locations(Location((0, 0, 0), (0, 0, 180))):
            Circle(SKETCH_14_R)
    extrude(amount=-CUT_EXTRUDE_8_DEPTH, mode=Mode.SUBTRACT)

    # Эскиз15 → Бобышка-Вытянуть7 (add)
    with BuildSketch(Plane.XY.offset(71)):
        Circle(SKETCH_15_R)
    extrude(amount=EXTRUDE_7_DEPTH)

    # Эскиз16 → Вырез-Вытянуть9 (cut)
    with BuildSketch(Plane.XY.offset(72).offset(CUT_EXTRUDE_START_2)):
        with Locations(Location((0, 0, 0), (0, 0, 180))):
            Circle(SKETCH_16_R)
    extrude(amount=CUT_EXTRUDE_9_DEPTH, mode=Mode.SUBTRACT)

    # Фаска3
    chamfer_3_edges = [body_3.edges().sort_by_distance(p)[0] for p in [
        (-3.25, 0, 71),
    ]]
    chamfer(chamfer_3_edges, length=CHAMFER_3_SIZE - 0.0001)  # a hair under: the kernel refuses the full size

    # Скругление8
    fillet_8_edges = [body_3.edges().sort_by_distance(p)[0] for p in [
        (5.5, 0, 75),
    ]]
    fillet(fillet_8_edges, radius=FILLET_8_R)


with BuildPart() as cut_extrude1_tool:
    # Sketch2 → Cut-Extrude1 (new, through all)
    with BuildSketch(Plane.XZ.offset(28.2)):
        with Locations((-0.540045897, 65.575712819)):
            Rectangle(SKETCH2_W, SKETCH2_H)
    extrude(amount=-CUT_EXTRUDE1_DEPTH)


with BuildPart() as body_2_1:
    add(body_2.part)

    # Cut-Extrude1: cut by cut_extrude1_tool
    add(cut_extrude1_tool.part, mode=Mode.SUBTRACT)


with BuildPart() as body_3_1:
    add(body_3.part)

    # Cut-Extrude1: cut by cut_extrude1_tool
    add(cut_extrude1_tool.part, mode=Mode.SUBTRACT)


solid = Compound([part.part, body_2_1.part])
